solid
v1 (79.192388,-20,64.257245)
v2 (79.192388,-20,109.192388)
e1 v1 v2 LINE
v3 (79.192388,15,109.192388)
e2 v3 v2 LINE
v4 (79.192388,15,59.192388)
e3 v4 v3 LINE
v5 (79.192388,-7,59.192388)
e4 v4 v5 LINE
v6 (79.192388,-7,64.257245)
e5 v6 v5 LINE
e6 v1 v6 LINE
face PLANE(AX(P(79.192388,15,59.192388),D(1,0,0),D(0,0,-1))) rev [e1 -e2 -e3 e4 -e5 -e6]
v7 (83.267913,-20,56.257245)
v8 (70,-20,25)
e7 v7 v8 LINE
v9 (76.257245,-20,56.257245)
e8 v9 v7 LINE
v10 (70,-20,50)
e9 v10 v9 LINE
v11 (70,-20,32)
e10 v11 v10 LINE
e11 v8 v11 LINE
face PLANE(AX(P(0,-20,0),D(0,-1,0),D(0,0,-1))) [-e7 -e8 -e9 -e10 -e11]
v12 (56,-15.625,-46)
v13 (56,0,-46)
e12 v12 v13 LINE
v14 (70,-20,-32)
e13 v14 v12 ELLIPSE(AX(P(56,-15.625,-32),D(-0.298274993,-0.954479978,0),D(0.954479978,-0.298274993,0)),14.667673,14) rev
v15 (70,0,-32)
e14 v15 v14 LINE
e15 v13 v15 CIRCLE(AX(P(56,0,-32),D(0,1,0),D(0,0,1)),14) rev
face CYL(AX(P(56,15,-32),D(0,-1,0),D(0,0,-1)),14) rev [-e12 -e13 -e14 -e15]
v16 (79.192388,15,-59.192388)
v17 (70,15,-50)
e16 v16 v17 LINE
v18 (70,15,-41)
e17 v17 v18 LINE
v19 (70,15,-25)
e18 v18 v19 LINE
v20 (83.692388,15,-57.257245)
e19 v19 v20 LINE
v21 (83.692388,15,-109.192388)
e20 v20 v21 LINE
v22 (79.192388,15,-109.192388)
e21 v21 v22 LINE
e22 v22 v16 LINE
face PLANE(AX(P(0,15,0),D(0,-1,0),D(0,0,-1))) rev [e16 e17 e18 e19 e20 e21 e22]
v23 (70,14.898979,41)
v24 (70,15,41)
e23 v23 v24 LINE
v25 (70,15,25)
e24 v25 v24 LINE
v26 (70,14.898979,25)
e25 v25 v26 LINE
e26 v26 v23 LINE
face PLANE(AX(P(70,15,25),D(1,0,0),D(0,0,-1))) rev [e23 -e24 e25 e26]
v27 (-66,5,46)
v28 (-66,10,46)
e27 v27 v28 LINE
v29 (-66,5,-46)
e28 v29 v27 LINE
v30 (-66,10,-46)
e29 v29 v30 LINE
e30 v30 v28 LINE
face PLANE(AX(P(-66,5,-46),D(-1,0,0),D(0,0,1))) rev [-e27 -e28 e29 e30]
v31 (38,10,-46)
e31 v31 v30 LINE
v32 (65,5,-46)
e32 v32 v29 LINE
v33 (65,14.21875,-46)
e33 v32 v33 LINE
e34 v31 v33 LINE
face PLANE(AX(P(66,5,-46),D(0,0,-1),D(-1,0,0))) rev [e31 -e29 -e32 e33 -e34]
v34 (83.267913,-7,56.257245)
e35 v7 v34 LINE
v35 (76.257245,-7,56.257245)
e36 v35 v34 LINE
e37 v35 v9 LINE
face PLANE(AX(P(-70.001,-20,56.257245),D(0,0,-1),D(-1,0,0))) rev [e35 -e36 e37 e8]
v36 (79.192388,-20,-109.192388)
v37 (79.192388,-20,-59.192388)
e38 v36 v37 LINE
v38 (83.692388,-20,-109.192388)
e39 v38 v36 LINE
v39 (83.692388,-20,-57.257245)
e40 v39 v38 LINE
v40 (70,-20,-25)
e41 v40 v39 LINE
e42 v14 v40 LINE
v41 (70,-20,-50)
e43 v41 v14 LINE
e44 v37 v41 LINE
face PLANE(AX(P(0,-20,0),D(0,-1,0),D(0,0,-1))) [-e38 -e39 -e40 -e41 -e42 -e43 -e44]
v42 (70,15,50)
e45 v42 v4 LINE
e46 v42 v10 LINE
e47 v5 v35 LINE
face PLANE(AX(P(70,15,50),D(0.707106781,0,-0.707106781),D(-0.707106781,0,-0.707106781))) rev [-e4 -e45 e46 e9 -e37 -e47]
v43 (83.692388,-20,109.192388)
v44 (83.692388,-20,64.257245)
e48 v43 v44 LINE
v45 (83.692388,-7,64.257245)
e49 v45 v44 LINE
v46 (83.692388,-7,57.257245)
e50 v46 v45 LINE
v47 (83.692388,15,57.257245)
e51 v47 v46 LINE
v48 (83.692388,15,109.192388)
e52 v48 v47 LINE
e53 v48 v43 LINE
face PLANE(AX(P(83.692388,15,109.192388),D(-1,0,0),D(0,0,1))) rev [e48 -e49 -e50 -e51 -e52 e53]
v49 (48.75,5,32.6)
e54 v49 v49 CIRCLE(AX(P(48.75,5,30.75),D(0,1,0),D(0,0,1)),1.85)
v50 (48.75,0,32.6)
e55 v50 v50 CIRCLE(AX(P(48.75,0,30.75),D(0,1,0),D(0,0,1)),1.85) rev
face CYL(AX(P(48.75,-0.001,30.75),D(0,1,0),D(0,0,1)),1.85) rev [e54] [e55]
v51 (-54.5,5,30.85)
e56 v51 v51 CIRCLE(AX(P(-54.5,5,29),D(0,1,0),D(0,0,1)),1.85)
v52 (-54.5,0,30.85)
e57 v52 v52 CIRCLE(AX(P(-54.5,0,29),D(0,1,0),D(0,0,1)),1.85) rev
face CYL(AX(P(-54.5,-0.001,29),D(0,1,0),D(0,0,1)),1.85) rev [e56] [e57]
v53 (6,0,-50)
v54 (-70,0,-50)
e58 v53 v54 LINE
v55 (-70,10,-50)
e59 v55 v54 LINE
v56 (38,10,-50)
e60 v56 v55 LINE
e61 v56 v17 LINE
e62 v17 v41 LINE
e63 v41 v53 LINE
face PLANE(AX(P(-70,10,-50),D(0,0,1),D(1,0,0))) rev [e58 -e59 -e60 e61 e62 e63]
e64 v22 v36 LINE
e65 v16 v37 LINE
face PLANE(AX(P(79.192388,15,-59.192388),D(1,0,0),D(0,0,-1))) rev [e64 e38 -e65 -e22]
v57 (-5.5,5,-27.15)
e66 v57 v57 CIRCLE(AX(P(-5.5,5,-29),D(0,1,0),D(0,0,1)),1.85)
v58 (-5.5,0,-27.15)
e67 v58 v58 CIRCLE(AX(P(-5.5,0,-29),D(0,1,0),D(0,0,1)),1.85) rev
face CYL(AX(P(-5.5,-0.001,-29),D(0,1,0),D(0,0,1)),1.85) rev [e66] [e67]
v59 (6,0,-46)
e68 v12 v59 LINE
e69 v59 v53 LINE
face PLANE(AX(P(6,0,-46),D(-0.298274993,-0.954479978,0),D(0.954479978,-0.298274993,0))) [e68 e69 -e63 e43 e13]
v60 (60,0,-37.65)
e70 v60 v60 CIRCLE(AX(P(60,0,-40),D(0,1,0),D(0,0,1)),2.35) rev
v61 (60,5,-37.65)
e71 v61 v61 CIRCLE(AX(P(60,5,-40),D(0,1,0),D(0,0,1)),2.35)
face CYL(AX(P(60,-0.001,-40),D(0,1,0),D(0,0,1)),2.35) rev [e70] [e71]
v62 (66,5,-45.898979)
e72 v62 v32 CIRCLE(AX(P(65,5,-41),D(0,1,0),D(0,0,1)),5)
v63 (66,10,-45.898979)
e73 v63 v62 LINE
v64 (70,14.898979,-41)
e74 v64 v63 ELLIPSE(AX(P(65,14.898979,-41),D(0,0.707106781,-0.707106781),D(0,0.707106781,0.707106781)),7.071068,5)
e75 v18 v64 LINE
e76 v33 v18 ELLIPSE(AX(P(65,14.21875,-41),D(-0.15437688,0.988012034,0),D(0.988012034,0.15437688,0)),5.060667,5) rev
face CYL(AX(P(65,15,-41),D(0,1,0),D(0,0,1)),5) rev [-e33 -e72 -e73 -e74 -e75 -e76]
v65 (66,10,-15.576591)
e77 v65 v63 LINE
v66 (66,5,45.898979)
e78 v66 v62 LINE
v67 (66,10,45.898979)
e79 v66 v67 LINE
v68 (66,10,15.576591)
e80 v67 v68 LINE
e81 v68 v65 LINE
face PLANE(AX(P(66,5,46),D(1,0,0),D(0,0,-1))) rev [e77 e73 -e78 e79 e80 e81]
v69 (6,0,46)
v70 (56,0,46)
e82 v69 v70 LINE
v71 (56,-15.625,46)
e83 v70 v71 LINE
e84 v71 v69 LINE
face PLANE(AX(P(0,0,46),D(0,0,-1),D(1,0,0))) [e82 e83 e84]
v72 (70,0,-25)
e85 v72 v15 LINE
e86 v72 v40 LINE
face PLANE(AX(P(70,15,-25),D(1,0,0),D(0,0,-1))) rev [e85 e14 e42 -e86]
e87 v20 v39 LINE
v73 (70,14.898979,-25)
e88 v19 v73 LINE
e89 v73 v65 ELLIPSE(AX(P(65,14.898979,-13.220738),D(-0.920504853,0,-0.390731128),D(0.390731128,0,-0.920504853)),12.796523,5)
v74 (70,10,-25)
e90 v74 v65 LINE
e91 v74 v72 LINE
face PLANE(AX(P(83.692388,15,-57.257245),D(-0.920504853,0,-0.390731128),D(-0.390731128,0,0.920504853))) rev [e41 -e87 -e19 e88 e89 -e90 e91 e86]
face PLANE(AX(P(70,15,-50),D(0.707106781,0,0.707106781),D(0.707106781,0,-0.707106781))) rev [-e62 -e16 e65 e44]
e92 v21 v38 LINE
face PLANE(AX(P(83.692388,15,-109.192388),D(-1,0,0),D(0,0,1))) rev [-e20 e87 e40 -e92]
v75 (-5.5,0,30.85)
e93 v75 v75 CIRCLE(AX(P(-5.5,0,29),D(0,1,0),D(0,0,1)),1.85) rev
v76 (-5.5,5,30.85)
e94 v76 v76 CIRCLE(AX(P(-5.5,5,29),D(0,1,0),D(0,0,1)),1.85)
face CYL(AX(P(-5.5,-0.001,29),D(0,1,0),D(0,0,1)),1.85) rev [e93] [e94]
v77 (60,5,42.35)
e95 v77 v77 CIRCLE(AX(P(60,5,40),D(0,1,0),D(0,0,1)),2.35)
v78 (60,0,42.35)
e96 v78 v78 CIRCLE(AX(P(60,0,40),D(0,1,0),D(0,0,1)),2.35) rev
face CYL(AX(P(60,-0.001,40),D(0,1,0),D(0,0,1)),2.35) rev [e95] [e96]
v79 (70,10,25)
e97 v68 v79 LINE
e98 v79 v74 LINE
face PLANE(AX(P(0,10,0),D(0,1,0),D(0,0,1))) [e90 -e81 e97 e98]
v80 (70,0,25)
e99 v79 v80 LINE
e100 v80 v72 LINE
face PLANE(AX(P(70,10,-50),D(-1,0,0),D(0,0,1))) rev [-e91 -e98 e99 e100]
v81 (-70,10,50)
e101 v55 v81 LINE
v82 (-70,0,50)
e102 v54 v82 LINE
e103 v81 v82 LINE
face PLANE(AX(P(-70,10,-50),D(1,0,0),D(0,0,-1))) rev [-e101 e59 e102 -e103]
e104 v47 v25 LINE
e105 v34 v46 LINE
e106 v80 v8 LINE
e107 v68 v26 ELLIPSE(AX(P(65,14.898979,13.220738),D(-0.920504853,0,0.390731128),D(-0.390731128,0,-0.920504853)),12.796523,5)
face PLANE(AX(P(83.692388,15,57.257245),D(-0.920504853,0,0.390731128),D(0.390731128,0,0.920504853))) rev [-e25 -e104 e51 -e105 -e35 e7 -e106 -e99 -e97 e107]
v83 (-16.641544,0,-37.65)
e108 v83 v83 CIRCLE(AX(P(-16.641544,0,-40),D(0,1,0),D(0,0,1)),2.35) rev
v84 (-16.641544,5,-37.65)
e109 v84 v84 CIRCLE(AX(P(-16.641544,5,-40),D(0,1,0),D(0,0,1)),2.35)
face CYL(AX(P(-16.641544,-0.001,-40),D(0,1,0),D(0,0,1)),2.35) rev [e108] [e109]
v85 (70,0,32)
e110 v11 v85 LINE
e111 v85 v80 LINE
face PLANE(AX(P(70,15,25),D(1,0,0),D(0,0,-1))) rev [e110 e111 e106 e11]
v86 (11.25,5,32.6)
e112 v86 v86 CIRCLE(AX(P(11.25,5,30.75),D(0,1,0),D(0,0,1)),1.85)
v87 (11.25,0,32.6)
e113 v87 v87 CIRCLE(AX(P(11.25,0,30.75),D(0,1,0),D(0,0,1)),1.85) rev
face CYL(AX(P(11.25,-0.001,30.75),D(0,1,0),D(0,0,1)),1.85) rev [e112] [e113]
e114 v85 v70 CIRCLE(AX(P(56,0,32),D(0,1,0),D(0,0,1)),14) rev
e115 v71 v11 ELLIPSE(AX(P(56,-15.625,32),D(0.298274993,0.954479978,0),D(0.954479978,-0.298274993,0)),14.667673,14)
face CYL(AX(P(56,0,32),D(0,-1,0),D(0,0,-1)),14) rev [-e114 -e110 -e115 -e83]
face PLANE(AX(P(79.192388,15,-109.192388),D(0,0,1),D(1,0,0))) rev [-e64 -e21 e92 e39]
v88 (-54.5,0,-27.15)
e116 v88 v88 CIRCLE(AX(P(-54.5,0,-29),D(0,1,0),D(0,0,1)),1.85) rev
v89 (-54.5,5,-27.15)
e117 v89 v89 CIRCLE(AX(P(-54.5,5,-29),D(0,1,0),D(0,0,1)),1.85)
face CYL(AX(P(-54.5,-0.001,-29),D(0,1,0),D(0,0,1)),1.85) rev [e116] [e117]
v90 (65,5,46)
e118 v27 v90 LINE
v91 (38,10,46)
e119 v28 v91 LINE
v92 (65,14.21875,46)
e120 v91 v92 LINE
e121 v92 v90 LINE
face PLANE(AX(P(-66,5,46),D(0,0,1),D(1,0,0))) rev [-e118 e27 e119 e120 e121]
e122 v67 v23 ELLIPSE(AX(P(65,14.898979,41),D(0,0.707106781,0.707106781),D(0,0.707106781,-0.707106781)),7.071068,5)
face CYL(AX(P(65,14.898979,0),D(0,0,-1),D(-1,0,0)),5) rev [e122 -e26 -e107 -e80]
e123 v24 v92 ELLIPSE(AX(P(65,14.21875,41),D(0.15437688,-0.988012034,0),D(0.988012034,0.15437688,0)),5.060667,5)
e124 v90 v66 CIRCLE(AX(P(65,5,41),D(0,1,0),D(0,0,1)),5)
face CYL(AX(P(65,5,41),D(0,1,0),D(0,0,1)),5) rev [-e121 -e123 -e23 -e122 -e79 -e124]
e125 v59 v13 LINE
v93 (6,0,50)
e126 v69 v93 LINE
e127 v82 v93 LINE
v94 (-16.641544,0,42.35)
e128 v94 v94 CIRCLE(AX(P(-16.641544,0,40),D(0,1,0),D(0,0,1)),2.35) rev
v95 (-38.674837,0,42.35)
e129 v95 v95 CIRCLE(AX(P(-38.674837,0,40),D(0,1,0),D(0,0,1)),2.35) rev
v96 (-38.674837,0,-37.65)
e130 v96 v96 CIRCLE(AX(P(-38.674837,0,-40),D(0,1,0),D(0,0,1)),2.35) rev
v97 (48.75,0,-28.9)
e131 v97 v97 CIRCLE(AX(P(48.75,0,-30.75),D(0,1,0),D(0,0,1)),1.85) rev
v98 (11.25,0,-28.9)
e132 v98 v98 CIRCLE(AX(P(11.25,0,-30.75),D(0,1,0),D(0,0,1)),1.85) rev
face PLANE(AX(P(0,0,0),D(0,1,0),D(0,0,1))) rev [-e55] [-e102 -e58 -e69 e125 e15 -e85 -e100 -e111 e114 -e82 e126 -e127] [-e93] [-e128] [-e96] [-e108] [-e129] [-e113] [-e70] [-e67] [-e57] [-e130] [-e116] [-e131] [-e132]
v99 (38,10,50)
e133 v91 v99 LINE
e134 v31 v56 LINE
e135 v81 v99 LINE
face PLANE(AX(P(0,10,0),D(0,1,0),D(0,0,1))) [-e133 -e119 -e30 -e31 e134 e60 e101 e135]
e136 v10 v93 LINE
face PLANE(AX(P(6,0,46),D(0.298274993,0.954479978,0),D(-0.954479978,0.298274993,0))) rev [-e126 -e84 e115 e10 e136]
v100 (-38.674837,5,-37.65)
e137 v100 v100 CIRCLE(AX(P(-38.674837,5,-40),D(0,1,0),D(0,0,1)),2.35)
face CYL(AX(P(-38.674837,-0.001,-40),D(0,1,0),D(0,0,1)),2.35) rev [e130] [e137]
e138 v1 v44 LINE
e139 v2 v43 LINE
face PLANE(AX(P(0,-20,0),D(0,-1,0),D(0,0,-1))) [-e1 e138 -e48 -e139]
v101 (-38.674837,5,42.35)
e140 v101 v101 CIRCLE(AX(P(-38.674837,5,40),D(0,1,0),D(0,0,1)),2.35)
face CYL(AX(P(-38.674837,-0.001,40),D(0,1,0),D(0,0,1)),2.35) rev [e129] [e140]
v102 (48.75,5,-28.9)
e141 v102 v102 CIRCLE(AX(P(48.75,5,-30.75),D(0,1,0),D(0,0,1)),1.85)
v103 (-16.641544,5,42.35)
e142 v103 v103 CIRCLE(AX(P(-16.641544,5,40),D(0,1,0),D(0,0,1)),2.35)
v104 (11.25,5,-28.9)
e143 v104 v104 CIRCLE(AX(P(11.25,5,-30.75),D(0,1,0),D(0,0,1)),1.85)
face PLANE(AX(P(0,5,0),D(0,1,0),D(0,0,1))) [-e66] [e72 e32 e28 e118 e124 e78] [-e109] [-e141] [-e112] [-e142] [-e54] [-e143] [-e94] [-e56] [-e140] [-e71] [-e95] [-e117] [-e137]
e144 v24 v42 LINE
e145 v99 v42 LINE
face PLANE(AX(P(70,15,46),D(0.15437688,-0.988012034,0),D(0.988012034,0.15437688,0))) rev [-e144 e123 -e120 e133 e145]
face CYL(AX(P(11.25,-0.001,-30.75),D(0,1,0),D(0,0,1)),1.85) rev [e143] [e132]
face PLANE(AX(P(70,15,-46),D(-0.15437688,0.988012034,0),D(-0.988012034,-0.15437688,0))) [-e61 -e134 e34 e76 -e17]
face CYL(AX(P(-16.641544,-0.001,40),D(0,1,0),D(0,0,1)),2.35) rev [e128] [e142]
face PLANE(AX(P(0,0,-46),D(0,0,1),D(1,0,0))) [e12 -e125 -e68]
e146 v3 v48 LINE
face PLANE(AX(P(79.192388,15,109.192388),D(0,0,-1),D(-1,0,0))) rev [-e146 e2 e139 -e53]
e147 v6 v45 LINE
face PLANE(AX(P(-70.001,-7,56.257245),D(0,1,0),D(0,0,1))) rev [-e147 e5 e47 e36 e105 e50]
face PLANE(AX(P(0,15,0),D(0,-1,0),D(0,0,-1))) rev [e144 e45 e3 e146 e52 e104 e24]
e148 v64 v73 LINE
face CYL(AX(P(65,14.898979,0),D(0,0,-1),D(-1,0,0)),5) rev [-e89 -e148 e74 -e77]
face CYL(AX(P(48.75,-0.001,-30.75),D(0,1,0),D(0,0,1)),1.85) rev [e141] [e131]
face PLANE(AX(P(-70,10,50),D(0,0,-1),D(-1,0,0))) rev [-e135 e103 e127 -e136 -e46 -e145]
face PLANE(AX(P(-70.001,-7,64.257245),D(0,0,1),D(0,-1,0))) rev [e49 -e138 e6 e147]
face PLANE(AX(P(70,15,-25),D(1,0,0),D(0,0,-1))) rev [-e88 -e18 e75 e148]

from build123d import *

# Parameters (mm, degrees)
SKETCH1_W                = 140
SKETCH1_H                = 100
BOSS_EXTRUDE1_DEPTH      = 10
SKETCH2_W                = 132
SKETCH2_H                = 92
CUT_EXTRUDE1_DEPTH       = 5
CUT_EXTRUDE2_REACH       = 88.168
SKETCH6_R                = 2.35
CUT_EXTRUDE3_REACH       = 88.168
SKETCH9_R                = 1.85
BOSS_EXTRUDE2_DEPTH      = 15
BOSS_EXTRUDE2_DEPTH_BACK = 20
BOSS_EXTRUDE3_DEPTH      = 4
FILLET3_R                = 5
FILLET4_R                = 5
FILLET5_R                = 5
FILLET6_R                = 5
FILLET7_R                = 14
CUT_EXTRUDE4_REACH       = 191.59
SKETCH13_W               = 8
SKETCH13_H               = 13


with BuildPart() as part:
    # Sketch1 → Boss-Extrude1 (new body)
    with BuildSketch(Plane(origin=(0, 0, 0), x_dir=(1, 0, 0), z_dir=(0, 1, 0))):
        Rectangle(SKETCH1_W, SKETCH1_H)
    extrude(amount=BOSS_EXTRUDE1_DEPTH)

    # Sketch2 → Cut-Extrude1 (cut)
    with BuildSketch(Plane(origin=(0, 10, 0), x_dir=(1, 0, 0), z_dir=(0, 1, 0))):
        Rectangle(SKETCH2_W, SKETCH2_H)
    extrude(amount=-CUT_EXTRUDE1_DEPTH, mode=Mode.SUBTRACT)

    # Sketch6 → Cut-Extrude2 (cut, up to next)
    with BuildSketch(Plane(origin=(0, 5, 0), x_dir=(1, 0, 0), z_dir=(0, 1, 0)), mode=Mode.PRIVATE) as cut_extrude2_sk1:
        with Locations(Location((60, 40, 0), (0, 0, 270))):
            Circle(SKETCH6_R)
    cut_extrude2_tool1 = extrude(cut_extrude2_sk1.sketch, amount=-CUT_EXTRUDE2_REACH, mode=Mode.PRIVATE) & part.part
    # Sketch6 → Cut-Extrude2 (cut, up to next)
    with BuildSketch(Plane(origin=(0, 5, 0), x_dir=(1, 0, 0), z_dir=(0, 1, 0)), mode=Mode.PRIVATE) as cut_extrude2_sk2:
        with Locations(Location((60, -40, 0), (0, 0, 270))):
            Circle(SKETCH6_R)
    cut_extrude2_tool2 = extrude(cut_extrude2_sk2.sketch, amount=-CUT_EXTRUDE2_REACH, mode=Mode.PRIVATE) & part.part
    # Sketch6 → Cut-Extrude2 (cut, up to next)
    with BuildSketch(Plane(origin=(0, 5, 0), x_dir=(1, 0, 0), z_dir=(0, 1, 0)), mode=Mode.PRIVATE) as cut_extrude2_sk3:
        with Locations(Location((-16.641543992, -40, 0), (0, 0, 270))):
            Circle(SKETCH6_R)
    cut_extrude2_tool3 = extrude(cut_extrude2_sk3.sketch, amount=-CUT_EXTRUDE2_REACH, mode=Mode.PRIVATE) & part.part
    # Sketch6 → Cut-Extrude2 (cut, up to next)
    with BuildSketch(Plane(origin=(0, 5, 0), x_dir=(1, 0, 0), z_dir=(0, 1, 0)), mode=Mode.PRIVATE) as cut_extrude2_sk4:
        with Locations(Location((-16.641543992, 40, 0), (0, 0, 270))):
            Circle(SKETCH6_R)
    cut_extrude2_tool4 = extrude(cut_extrude2_sk4.sketch, amount=-CUT_EXTRUDE2_REACH, mode=Mode.PRIVATE) & part.part
    # Sketch6 → Cut-Extrude2 (cut, up to next)
    with BuildSketch(Plane(origin=(0, 5, 0), x_dir=(1, 0, 0), z_dir=(0, 1, 0)), mode=Mode.PRIVATE) as cut_extrude2_sk5:
        with Locations(Location((-38.674837349, -40, 0), (0, 0, 270))):
            Circle(SKETCH6_R)
    cut_extrude2_tool5 = extrude(cut_extrude2_sk5.sketch, amount=-CUT_EXTRUDE2_REACH, mode=Mode.PRIVATE) & part.part
    # Sketch6 → Cut-Extrude2 (cut, up to next)
    with BuildSketch(Plane(origin=(0, 5, 0), x_dir=(1, 0, 0), z_dir=(0, 1, 0)), mode=Mode.PRIVATE) as cut_extrude2_sk6:
        with Locations(Location((-38.674837349, 40, 0), (0, 0, 270))):
            Circle(SKETCH6_R)
    cut_extrude2_tool6 = extrude(cut_extrude2_sk6.sketch, amount=-CUT_EXTRUDE2_REACH, mode=Mode.PRIVATE) & part.part
    add(cut_extrude2_tool1.solids().sort_by_distance((60, 5, -40))[0], mode=Mode.SUBTRACT)
    add(cut_extrude2_tool2.solids().sort_by_distance((60, 5, 40))[0], mode=Mode.SUBTRACT)
    add(cut_extrude2_tool3.solids().sort_by_distance((-16.641544, 5, 40))[0], mode=Mode.SUBTRACT)
    add(cut_extrude2_tool4.solids().sort_by_distance((-16.641544, 5, -40))[0], mode=Mode.SUBTRACT)
    add(cut_extrude2_tool5.solids().sort_by_distance((-38.674837, 5, 40))[0], mode=Mode.SUBTRACT)
    add(cut_extrude2_tool6.solids().sort_by_distance((-38.674837, 5, -40))[0], mode=Mode.SUBTRACT)

    # Sketch9 → Cut-Extrude3 (cut, up to next)
    with BuildSketch(Plane(origin=(0, 5, 0), x_dir=(1, 0, 0), z_dir=(0, 1, 0)), mode=Mode.PRIVATE) as cut_extrude3_sk1:
        with Locations(Location((-54.5, 29, 0), (0, 0, 270))):
            Circle(SKETCH9_R)
    cut_extrude3_tool1 = extrude(cut_extrude3_sk1.sketch, amount=-CUT_EXTRUDE3_REACH, mode=Mode.PRIVATE) & part.part
    # Sketch9 → Cut-Extrude3 (cut, up to next)
    with BuildSketch(Plane(origin=(0, 5, 0), x_dir=(1, 0, 0), z_dir=(0, 1, 0)), mode=Mode.PRIVATE) as cut_extrude3_sk2:
        with Locations(Location((-5.5, 29, 0), (0, 0, 270))):
            Circle(SKETCH9_R)
    cut_extrude3_tool2 = extrude(cut_extrude3_sk2.sketch, amount=-CUT_EXTRUDE3_REACH, mode=Mode.PRIVATE) & part.part
    # Sketch9 → Cut-Extrude3 (cut, up to next)
    with BuildSketch(Plane(origin=(0, 5, 0), x_dir=(1, 0, 0), z_dir=(0, 1, 0)), mode=Mode.PRIVATE) as cut_extrude3_sk3:
        with Locations(Location((-54.5, -29, 0), (0, 0, 270))):
            Circle(SKETCH9_R)
    cut_extrude3_tool3 = extrude(cut_extrude3_sk3.sketch, amount=-CUT_EXTRUDE3_REACH, mode=Mode.PRIVATE) & part.part
    # Sketch9 → Cut-Extrude3 (cut, up to next)
    with BuildSketch(Plane(origin=(0, 5, 0), x_dir=(1, 0, 0), z_dir=(0, 1, 0)), mode=Mode.PRIVATE) as cut_extrude3_sk4:
        with Locations(Location((-5.5, -29, 0), (0, 0, 270))):
            Circle(SKETCH9_R)
    cut_extrude3_tool4 = extrude(cut_extrude3_sk4.sketch, amount=-CUT_EXTRUDE3_REACH, mode=Mode.PRIVATE) & part.part
    # Sketch9 → Cut-Extrude3 (cut, up to next)
    with BuildSketch(Plane(origin=(0, 5, 0), x_dir=(1, 0, 0), z_dir=(0, 1, 0)), mode=Mode.PRIVATE) as cut_extrude3_sk5:
        with Locations(Location((11.25, 30.75, 0), (0, 0, 270))):
            Circle(SKETCH9_R)
    cut_extrude3_tool5 = extrude(cut_extrude3_sk5.sketch, amount=-CUT_EXTRUDE3_REACH, mode=Mode.PRIVATE) & part.part
    # Sketch9 → Cut-Extrude3 (cut, up to next)
    with BuildSketch(Plane(origin=(0, 5, 0), x_dir=(1, 0, 0), z_dir=(0, 1, 0)), mode=Mode.PRIVATE) as cut_extrude3_sk6:
        with Locations(Location((48.75, 30.75, 0), (0, 0, 270))):
            Circle(SKETCH9_R)
    cut_extrude3_tool6 = extrude(cut_extrude3_sk6.sketch, amount=-CUT_EXTRUDE3_REACH, mode=Mode.PRIVATE) & part.part
    # Sketch9 → Cut-Extrude3 (cut, up to next)
    with BuildSketch(Plane(origin=(0, 5, 0), x_dir=(1, 0, 0), z_dir=(0, 1, 0)), mode=Mode.PRIVATE) as cut_extrude3_sk7:
        with Locations(Location((48.75, -30.75, 0), (0, 0, 270))):
            Circle(SKETCH9_R)
    cut_extrude3_tool7 = extrude(cut_extrude3_sk7.sketch, amount=-CUT_EXTRUDE3_REACH, mode=Mode.PRIVATE) & part.part
    # Sketch9 → Cut-Extrude3 (cut, up to next)
    with BuildSketch(Plane(origin=(0, 5, 0), x_dir=(1, 0, 0), z_dir=(0, 1, 0)), mode=Mode.PRIVATE) as cut_extrude3_sk8:
        with Locations(Location((11.25, -30.75, 0), (0, 0, 270))):
            Circle(SKETCH9_R)
    cut_extrude3_tool8 = extrude(cut_extrude3_sk8.sketch, amount=-CUT_EXTRUDE3_REACH, mode=Mode.PRIVATE) & part.part
    add(cut_extrude3_tool1.solids().sort_by_distance((-54.5, 5, -29))[0], mode=Mode.SUBTRACT)
    add(cut_extrude3_tool2.solids().sort_by_distance((-5.5, 5, -29))[0], mode=Mode.SUBTRACT)
    add(cut_extrude3_tool3.solids().sort_by_distance((-54.5, 5, 29))[0], mode=Mode.SUBTRACT)
    add(cut_extrude3_tool4.solids().sort_by_distance((-5.5, 5, 29))[0], mode=Mode.SUBTRACT)
    add(cut_extrude3_tool5.solids().sort_by_distance((11.25, 5, -30.75))[0], mode=Mode.SUBTRACT)
    add(cut_extrude3_tool6.solids().sort_by_distance((48.75, 5, -30.75))[0], mode=Mode.SUBTRACT)
    add(cut_extrude3_tool7.solids().sort_by_distance((48.75, 5, 30.75))[0], mode=Mode.SUBTRACT)
    add(cut_extrude3_tool8.solids().sort_by_distance((11.25, 5, 30.75))[0], mode=Mode.SUBTRACT)

    # Sketch11 → Boss-Extrude2 (add, two sides: drawn at the far end of the back side and taken through both)
    with BuildSketch(Plane(origin=(0, 0, 0), x_dir=(1, 0, 0), z_dir=(0, 1, 0)).offset(-BOSS_EXTRUDE2_DEPTH_BACK)):
        Polygon((70, 50), (79.192388155, 59.192388155), (79.192388155, 109.192388155), (83.692388155, 109.192388155), (83.692388155, 57.25724503), (70, 25), align=None)
        Polygon((70, -25), (70, -50), (79.192388155, -59.192388155), (79.192388155, -109.192388155), (83.692388155, -109.192388155), (83.692388155, -57.25724503), align=None)
    extrude(amount=BOSS_EXTRUDE2_DEPTH + BOSS_EXTRUDE2_DEPTH_BACK)

    # Sketch12 → Boss-Extrude3 (add)
    with BuildSketch(Plane(origin=(0, 0, -50), x_dir=(-1, 0, 0), z_dir=(0, 0, -1))):
        Polygon((-70, 15), (-38, 10), (-70, 10), align=None)
        Polygon((-70, -20), (-70, 0), (-6, 0), align=None)
    boss_extrude3 = extrude(amount=-BOSS_EXTRUDE3_DEPTH)

    # Fillet3
    # the kernel refuses this fillet: 5 mm, written as the material it adds along each edge
    with BuildSketch(Plane(origin=(70, 10, -58.247448714), x_dir=(0, 1, 0), z_dir=(0, 0, 1))) as fillet3_piece_1_section:
        with BuildLine():
            CenterArc((4.898979486, 5), FILLET3_R, 191.536959033, 78.463040967)
            Line((0, 4), (0, 0))
            Line((0, 0), (4.898979486, 0))
        make_face()
    fillet3_piece_1 = extrude(amount=45.494897428, mode=Mode.PRIVATE)
    fillet3_piece_1 = split(fillet3_piece_1, bisect_by=Plane(origin=(81.95810656, 10, -53.17153363), z_dir=(-0.9205048534524429, 0, -0.3907311284892677)), keep=Keep.TOP, mode=Mode.PRIVATE)
    fillet3_piece_1 = split(fillet3_piece_1, bisect_by=Plane(origin=(74.123724357, 10, -54.123724357), z_dir=(0.7071067811865478, 0, 0.7071067811865472)), keep=Keep.TOP, mode=Mode.PRIVATE)
    add(fillet3_piece_1)

    # Fillet4
    # the kernel refuses this fillet: 5 mm, written as the material it adds along each edge
    with BuildSketch(Plane(origin=(70, 2.398979486, -46), x_dir=(0, 0, 1), z_dir=(0, 1, 0))) as fillet4_piece_1_section:
        with BuildLine():
            CenterArc((FILLET4_R, -FILLET4_R), FILLET4_R, 90, 90)
            Line((0, -FILLET4_R), (0, 0))
            Line((0, 0), (FILLET4_R, 0))
        make_face()
    fillet4_piece_1 = extrude(amount=25.101020514, mode=Mode.PRIVATE)
    fillet4_piece_1 = split(fillet4_piece_1, bisect_by=Plane(origin=(68.07801403, 14.699689692, -46), z_dir=(0.15437688027360966, -0.9880120337511015, 0)), keep=Keep.TOP, mode=Mode.PRIVATE)
    add(fillet4_piece_1)

    # Mirror6: Boss-Extrude3 across plane
    add(boss_extrude3.mirror(Plane.XY))

    # Fillet5
    # the kernel refuses this fillet: 5 mm, written as the material it adds along each edge
    with BuildSketch(Plane(origin=(70, 10, 12.752551286), x_dir=(-1.0, 1.5649703755111202e-12, 0), z_dir=(0, 0, 1))) as fillet5_piece_1_section:
        with BuildLine():
            CenterArc((5, -4.898979486), FILLET5_R, 101.536959033, 78.463040967)
            Line((0, -4.898979486), (0, 0))
            Line((0, 0), (4, 0))
        make_face()
    fillet5_piece_1 = extrude(amount=45.494897428, mode=Mode.PRIVATE)
    fillet5_piece_1 = split(fillet5_piece_1, bisect_by=Plane(origin=(51.376275643, 10, 31.376275643), z_dir=(0.7071067811865478, 0, -0.7071067811865472)), keep=Keep.TOP, mode=Mode.PRIVATE)
    fillet5_piece_1 = split(fillet5_piece_1, bisect_by=Plane(origin=(65.594961344, 10, 14.62237926), z_dir=(-0.9205048534524429, 0, 0.3907311284892677)), keep=Keep.TOP, mode=Mode.PRIVATE)
    add(fillet5_piece_1)

    # Fillet6
    # the kernel refuses this fillet: 5 mm, written as the material it adds along each edge
    with BuildSketch(Plane(origin=(70, 2.398979486, 46), x_dir=(-1, 0, 0), z_dir=(0, 1, 0))) as fillet6_piece_1_section:
        with BuildLine():
            CenterArc((FILLET6_R, -FILLET6_R), FILLET6_R, 90, 90)
            Line((0, -FILLET6_R), (0, 0))
            Line((0, 0), (FILLET6_R, 0))
        make_face()
    fillet6_piece_1 = extrude(amount=25.101020514, mode=Mode.PRIVATE)
    fillet6_piece_1 = split(fillet6_piece_1, bisect_by=Plane(origin=(68.07801403, 14.699689692, 46), z_dir=(0.15437688027360966, -0.9880120337511015, 0)), keep=Keep.TOP, mode=Mode.PRIVATE)
    add(fillet6_piece_1)

    # Fillet7
    fillet7_edges = [part.edges().sort_by_distance(p)[0] for p in [
        (70, -10, -46),
        (70, -10, 46),
    ]]
    fillet(fillet7_edges, radius=FILLET7_R)

    # Sketch13 → Cut-Extrude4 (cut, up to next)
    with BuildSketch(Plane(origin=(83.692388155, 0, 0), x_dir=(0, 0, -1), z_dir=(1, 0, 0)), mode=Mode.PRIVATE) as cut_extrude4_sk1:
        with Locations((-60.25724503, -13.5)):
            Rectangle(SKETCH13_W, SKETCH13_H)
    cut_extrude4_tool1 = extrude(cut_extrude4_sk1.sketch, amount=-CUT_EXTRUDE4_REACH, mode=Mode.PRIVATE) & part.part
    add(cut_extrude4_tool1.solids().sort_by_distance((83.692388, -13.5, 60.257245))[0], mode=Mode.SUBTRACT)


solid = part.part
